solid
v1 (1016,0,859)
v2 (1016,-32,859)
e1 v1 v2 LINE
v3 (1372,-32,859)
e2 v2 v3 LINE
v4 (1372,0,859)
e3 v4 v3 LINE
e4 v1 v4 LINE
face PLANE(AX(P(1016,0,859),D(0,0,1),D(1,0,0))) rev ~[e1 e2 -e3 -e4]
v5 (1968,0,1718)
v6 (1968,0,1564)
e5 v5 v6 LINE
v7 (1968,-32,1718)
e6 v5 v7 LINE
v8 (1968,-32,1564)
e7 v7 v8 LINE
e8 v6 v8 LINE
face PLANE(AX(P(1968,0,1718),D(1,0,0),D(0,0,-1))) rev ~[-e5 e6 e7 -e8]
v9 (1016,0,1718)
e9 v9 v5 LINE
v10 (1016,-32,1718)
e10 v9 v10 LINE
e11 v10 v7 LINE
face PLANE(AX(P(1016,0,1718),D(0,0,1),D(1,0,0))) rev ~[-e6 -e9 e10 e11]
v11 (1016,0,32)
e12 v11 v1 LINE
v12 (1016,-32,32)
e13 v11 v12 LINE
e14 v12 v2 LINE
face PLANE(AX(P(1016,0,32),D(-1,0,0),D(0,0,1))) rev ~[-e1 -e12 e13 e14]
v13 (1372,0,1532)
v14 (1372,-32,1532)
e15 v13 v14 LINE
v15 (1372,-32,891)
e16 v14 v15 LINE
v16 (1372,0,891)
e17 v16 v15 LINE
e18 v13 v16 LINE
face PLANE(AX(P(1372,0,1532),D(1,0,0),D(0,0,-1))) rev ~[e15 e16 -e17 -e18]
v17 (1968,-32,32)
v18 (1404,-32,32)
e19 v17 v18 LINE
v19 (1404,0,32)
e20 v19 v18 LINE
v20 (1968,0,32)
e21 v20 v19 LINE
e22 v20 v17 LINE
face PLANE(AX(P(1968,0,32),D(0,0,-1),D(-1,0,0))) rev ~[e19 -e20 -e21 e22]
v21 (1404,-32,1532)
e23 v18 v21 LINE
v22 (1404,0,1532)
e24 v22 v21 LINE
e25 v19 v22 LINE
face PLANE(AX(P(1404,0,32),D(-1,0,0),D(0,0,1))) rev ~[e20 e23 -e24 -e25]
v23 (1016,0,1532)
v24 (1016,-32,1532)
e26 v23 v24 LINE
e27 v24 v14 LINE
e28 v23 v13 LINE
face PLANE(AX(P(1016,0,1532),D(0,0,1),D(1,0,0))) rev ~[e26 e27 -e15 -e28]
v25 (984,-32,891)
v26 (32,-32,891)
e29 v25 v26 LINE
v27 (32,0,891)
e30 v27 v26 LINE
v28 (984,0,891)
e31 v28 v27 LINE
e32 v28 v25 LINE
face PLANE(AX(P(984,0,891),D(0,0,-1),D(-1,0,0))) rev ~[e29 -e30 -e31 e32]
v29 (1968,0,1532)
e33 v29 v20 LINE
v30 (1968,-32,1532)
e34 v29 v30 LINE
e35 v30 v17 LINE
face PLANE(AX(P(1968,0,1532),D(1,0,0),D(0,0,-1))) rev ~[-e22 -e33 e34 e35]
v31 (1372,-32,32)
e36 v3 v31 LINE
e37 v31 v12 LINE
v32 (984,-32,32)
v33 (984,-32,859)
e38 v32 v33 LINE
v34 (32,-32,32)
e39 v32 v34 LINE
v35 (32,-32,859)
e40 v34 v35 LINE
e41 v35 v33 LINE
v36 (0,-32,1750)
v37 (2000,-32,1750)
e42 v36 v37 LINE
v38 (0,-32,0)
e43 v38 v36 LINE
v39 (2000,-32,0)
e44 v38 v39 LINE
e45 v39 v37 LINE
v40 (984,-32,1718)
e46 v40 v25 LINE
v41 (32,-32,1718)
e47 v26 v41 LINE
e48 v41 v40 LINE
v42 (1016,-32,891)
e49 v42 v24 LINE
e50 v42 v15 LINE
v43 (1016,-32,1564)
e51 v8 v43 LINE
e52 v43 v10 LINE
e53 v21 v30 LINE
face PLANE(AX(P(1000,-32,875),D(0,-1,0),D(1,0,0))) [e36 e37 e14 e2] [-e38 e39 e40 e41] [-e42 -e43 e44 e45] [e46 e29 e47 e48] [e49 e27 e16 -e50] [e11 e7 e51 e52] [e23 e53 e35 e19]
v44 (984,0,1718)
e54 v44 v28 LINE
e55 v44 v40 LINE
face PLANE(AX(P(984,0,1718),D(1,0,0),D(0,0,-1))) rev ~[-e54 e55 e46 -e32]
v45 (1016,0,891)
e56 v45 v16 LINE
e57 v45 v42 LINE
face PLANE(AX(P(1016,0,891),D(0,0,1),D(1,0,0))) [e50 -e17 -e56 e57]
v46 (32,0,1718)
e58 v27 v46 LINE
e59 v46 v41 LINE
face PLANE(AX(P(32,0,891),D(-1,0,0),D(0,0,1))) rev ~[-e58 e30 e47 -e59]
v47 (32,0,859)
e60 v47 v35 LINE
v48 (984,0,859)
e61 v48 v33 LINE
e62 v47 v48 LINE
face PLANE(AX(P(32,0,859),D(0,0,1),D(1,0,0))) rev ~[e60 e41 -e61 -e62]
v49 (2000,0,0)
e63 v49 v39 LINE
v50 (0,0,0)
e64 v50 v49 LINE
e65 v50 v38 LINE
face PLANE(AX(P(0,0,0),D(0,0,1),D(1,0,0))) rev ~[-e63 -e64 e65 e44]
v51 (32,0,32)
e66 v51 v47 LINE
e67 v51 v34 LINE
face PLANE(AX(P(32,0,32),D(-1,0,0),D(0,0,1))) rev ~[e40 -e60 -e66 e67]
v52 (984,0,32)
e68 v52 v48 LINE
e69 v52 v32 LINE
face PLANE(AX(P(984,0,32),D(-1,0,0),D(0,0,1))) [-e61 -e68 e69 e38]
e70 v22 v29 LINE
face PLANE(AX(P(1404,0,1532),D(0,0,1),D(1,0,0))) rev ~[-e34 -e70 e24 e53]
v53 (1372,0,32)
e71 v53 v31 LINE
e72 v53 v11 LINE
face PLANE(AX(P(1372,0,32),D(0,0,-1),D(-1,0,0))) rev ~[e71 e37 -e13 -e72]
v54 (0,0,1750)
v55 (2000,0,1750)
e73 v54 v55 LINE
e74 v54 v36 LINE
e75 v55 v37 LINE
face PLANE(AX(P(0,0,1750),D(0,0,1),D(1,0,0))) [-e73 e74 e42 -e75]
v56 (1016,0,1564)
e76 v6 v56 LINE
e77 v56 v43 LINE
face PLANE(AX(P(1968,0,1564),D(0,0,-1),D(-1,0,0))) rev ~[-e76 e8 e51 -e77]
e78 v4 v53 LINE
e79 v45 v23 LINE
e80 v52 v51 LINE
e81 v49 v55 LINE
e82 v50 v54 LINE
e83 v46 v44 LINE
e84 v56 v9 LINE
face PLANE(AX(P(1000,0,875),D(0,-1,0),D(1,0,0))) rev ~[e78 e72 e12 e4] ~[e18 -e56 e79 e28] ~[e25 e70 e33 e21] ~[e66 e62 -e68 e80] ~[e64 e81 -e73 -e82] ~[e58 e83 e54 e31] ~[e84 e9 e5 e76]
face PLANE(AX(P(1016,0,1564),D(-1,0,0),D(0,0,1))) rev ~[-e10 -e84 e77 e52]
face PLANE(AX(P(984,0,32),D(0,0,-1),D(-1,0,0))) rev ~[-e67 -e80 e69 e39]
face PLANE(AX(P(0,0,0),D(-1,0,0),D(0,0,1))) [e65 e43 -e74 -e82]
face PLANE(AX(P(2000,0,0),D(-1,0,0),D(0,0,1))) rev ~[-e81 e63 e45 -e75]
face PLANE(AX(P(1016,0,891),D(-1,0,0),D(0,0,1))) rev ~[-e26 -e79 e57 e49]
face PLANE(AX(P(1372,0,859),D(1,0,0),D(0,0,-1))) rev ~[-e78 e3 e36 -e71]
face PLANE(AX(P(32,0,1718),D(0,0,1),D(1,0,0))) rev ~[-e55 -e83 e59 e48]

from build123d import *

# Parameters (mm, degrees)
F0_W     = 2000
F0_H     = 1750
F0_W_2   = 952
F0_H_2   = 32
F0_W_3   = 32
F0_H_3   = 827
F0_W_4   = 356
F1_DEPTH = 32


# Not quite as in the source:
# - a feature names something its author has since deleted; it is built from what else it names


with BuildPart() as f1:
    # F0 (on Front) → F1 (new body)
    with BuildSketch(Plane.XZ):
        with Locations((1000, 875)):
            Rectangle(F0_W, F0_H)
        Polygon((984, 32), (32, 32), (32, 859), (32, 891), (32, 1718), (984, 1718), (1016, 1718), (1968, 1718), (1968, 1564), (1968, 1532), (1968, 891), (1968, 859), (1968, 32), (1404, 32), (1372, 32), (1016, 32), align=None, mode=Mode.SUBTRACT)
        with Locations((508, 875)):
            Rectangle(F0_W_2, F0_H_2)
        with Locations((1000, 445.5)):
            Rectangle(F0_W_3, F0_H_3)
        with Locations((1000, 875)):
            Rectangle(F0_W_3, F0_H_2)
        Polygon((984, 1718), (984, 891), (1016, 891), (1016, 1532), (1016, 1564), (1016, 1718), align=None)
        with Locations((1194, 875)):
            Rectangle(F0_W_4, F0_H_2)
        Polygon((1372, 859), (1372, 32), (1404, 32), (1404, 1532), (1372, 1532), (1372, 891), align=None)
        Polygon((1016, 1564), (1016, 1532), (1372, 1532), (1404, 1532), (1968, 1532), (1968, 1564), align=None)
    extrude(amount=F1_DEPTH)


solid = f1.part
